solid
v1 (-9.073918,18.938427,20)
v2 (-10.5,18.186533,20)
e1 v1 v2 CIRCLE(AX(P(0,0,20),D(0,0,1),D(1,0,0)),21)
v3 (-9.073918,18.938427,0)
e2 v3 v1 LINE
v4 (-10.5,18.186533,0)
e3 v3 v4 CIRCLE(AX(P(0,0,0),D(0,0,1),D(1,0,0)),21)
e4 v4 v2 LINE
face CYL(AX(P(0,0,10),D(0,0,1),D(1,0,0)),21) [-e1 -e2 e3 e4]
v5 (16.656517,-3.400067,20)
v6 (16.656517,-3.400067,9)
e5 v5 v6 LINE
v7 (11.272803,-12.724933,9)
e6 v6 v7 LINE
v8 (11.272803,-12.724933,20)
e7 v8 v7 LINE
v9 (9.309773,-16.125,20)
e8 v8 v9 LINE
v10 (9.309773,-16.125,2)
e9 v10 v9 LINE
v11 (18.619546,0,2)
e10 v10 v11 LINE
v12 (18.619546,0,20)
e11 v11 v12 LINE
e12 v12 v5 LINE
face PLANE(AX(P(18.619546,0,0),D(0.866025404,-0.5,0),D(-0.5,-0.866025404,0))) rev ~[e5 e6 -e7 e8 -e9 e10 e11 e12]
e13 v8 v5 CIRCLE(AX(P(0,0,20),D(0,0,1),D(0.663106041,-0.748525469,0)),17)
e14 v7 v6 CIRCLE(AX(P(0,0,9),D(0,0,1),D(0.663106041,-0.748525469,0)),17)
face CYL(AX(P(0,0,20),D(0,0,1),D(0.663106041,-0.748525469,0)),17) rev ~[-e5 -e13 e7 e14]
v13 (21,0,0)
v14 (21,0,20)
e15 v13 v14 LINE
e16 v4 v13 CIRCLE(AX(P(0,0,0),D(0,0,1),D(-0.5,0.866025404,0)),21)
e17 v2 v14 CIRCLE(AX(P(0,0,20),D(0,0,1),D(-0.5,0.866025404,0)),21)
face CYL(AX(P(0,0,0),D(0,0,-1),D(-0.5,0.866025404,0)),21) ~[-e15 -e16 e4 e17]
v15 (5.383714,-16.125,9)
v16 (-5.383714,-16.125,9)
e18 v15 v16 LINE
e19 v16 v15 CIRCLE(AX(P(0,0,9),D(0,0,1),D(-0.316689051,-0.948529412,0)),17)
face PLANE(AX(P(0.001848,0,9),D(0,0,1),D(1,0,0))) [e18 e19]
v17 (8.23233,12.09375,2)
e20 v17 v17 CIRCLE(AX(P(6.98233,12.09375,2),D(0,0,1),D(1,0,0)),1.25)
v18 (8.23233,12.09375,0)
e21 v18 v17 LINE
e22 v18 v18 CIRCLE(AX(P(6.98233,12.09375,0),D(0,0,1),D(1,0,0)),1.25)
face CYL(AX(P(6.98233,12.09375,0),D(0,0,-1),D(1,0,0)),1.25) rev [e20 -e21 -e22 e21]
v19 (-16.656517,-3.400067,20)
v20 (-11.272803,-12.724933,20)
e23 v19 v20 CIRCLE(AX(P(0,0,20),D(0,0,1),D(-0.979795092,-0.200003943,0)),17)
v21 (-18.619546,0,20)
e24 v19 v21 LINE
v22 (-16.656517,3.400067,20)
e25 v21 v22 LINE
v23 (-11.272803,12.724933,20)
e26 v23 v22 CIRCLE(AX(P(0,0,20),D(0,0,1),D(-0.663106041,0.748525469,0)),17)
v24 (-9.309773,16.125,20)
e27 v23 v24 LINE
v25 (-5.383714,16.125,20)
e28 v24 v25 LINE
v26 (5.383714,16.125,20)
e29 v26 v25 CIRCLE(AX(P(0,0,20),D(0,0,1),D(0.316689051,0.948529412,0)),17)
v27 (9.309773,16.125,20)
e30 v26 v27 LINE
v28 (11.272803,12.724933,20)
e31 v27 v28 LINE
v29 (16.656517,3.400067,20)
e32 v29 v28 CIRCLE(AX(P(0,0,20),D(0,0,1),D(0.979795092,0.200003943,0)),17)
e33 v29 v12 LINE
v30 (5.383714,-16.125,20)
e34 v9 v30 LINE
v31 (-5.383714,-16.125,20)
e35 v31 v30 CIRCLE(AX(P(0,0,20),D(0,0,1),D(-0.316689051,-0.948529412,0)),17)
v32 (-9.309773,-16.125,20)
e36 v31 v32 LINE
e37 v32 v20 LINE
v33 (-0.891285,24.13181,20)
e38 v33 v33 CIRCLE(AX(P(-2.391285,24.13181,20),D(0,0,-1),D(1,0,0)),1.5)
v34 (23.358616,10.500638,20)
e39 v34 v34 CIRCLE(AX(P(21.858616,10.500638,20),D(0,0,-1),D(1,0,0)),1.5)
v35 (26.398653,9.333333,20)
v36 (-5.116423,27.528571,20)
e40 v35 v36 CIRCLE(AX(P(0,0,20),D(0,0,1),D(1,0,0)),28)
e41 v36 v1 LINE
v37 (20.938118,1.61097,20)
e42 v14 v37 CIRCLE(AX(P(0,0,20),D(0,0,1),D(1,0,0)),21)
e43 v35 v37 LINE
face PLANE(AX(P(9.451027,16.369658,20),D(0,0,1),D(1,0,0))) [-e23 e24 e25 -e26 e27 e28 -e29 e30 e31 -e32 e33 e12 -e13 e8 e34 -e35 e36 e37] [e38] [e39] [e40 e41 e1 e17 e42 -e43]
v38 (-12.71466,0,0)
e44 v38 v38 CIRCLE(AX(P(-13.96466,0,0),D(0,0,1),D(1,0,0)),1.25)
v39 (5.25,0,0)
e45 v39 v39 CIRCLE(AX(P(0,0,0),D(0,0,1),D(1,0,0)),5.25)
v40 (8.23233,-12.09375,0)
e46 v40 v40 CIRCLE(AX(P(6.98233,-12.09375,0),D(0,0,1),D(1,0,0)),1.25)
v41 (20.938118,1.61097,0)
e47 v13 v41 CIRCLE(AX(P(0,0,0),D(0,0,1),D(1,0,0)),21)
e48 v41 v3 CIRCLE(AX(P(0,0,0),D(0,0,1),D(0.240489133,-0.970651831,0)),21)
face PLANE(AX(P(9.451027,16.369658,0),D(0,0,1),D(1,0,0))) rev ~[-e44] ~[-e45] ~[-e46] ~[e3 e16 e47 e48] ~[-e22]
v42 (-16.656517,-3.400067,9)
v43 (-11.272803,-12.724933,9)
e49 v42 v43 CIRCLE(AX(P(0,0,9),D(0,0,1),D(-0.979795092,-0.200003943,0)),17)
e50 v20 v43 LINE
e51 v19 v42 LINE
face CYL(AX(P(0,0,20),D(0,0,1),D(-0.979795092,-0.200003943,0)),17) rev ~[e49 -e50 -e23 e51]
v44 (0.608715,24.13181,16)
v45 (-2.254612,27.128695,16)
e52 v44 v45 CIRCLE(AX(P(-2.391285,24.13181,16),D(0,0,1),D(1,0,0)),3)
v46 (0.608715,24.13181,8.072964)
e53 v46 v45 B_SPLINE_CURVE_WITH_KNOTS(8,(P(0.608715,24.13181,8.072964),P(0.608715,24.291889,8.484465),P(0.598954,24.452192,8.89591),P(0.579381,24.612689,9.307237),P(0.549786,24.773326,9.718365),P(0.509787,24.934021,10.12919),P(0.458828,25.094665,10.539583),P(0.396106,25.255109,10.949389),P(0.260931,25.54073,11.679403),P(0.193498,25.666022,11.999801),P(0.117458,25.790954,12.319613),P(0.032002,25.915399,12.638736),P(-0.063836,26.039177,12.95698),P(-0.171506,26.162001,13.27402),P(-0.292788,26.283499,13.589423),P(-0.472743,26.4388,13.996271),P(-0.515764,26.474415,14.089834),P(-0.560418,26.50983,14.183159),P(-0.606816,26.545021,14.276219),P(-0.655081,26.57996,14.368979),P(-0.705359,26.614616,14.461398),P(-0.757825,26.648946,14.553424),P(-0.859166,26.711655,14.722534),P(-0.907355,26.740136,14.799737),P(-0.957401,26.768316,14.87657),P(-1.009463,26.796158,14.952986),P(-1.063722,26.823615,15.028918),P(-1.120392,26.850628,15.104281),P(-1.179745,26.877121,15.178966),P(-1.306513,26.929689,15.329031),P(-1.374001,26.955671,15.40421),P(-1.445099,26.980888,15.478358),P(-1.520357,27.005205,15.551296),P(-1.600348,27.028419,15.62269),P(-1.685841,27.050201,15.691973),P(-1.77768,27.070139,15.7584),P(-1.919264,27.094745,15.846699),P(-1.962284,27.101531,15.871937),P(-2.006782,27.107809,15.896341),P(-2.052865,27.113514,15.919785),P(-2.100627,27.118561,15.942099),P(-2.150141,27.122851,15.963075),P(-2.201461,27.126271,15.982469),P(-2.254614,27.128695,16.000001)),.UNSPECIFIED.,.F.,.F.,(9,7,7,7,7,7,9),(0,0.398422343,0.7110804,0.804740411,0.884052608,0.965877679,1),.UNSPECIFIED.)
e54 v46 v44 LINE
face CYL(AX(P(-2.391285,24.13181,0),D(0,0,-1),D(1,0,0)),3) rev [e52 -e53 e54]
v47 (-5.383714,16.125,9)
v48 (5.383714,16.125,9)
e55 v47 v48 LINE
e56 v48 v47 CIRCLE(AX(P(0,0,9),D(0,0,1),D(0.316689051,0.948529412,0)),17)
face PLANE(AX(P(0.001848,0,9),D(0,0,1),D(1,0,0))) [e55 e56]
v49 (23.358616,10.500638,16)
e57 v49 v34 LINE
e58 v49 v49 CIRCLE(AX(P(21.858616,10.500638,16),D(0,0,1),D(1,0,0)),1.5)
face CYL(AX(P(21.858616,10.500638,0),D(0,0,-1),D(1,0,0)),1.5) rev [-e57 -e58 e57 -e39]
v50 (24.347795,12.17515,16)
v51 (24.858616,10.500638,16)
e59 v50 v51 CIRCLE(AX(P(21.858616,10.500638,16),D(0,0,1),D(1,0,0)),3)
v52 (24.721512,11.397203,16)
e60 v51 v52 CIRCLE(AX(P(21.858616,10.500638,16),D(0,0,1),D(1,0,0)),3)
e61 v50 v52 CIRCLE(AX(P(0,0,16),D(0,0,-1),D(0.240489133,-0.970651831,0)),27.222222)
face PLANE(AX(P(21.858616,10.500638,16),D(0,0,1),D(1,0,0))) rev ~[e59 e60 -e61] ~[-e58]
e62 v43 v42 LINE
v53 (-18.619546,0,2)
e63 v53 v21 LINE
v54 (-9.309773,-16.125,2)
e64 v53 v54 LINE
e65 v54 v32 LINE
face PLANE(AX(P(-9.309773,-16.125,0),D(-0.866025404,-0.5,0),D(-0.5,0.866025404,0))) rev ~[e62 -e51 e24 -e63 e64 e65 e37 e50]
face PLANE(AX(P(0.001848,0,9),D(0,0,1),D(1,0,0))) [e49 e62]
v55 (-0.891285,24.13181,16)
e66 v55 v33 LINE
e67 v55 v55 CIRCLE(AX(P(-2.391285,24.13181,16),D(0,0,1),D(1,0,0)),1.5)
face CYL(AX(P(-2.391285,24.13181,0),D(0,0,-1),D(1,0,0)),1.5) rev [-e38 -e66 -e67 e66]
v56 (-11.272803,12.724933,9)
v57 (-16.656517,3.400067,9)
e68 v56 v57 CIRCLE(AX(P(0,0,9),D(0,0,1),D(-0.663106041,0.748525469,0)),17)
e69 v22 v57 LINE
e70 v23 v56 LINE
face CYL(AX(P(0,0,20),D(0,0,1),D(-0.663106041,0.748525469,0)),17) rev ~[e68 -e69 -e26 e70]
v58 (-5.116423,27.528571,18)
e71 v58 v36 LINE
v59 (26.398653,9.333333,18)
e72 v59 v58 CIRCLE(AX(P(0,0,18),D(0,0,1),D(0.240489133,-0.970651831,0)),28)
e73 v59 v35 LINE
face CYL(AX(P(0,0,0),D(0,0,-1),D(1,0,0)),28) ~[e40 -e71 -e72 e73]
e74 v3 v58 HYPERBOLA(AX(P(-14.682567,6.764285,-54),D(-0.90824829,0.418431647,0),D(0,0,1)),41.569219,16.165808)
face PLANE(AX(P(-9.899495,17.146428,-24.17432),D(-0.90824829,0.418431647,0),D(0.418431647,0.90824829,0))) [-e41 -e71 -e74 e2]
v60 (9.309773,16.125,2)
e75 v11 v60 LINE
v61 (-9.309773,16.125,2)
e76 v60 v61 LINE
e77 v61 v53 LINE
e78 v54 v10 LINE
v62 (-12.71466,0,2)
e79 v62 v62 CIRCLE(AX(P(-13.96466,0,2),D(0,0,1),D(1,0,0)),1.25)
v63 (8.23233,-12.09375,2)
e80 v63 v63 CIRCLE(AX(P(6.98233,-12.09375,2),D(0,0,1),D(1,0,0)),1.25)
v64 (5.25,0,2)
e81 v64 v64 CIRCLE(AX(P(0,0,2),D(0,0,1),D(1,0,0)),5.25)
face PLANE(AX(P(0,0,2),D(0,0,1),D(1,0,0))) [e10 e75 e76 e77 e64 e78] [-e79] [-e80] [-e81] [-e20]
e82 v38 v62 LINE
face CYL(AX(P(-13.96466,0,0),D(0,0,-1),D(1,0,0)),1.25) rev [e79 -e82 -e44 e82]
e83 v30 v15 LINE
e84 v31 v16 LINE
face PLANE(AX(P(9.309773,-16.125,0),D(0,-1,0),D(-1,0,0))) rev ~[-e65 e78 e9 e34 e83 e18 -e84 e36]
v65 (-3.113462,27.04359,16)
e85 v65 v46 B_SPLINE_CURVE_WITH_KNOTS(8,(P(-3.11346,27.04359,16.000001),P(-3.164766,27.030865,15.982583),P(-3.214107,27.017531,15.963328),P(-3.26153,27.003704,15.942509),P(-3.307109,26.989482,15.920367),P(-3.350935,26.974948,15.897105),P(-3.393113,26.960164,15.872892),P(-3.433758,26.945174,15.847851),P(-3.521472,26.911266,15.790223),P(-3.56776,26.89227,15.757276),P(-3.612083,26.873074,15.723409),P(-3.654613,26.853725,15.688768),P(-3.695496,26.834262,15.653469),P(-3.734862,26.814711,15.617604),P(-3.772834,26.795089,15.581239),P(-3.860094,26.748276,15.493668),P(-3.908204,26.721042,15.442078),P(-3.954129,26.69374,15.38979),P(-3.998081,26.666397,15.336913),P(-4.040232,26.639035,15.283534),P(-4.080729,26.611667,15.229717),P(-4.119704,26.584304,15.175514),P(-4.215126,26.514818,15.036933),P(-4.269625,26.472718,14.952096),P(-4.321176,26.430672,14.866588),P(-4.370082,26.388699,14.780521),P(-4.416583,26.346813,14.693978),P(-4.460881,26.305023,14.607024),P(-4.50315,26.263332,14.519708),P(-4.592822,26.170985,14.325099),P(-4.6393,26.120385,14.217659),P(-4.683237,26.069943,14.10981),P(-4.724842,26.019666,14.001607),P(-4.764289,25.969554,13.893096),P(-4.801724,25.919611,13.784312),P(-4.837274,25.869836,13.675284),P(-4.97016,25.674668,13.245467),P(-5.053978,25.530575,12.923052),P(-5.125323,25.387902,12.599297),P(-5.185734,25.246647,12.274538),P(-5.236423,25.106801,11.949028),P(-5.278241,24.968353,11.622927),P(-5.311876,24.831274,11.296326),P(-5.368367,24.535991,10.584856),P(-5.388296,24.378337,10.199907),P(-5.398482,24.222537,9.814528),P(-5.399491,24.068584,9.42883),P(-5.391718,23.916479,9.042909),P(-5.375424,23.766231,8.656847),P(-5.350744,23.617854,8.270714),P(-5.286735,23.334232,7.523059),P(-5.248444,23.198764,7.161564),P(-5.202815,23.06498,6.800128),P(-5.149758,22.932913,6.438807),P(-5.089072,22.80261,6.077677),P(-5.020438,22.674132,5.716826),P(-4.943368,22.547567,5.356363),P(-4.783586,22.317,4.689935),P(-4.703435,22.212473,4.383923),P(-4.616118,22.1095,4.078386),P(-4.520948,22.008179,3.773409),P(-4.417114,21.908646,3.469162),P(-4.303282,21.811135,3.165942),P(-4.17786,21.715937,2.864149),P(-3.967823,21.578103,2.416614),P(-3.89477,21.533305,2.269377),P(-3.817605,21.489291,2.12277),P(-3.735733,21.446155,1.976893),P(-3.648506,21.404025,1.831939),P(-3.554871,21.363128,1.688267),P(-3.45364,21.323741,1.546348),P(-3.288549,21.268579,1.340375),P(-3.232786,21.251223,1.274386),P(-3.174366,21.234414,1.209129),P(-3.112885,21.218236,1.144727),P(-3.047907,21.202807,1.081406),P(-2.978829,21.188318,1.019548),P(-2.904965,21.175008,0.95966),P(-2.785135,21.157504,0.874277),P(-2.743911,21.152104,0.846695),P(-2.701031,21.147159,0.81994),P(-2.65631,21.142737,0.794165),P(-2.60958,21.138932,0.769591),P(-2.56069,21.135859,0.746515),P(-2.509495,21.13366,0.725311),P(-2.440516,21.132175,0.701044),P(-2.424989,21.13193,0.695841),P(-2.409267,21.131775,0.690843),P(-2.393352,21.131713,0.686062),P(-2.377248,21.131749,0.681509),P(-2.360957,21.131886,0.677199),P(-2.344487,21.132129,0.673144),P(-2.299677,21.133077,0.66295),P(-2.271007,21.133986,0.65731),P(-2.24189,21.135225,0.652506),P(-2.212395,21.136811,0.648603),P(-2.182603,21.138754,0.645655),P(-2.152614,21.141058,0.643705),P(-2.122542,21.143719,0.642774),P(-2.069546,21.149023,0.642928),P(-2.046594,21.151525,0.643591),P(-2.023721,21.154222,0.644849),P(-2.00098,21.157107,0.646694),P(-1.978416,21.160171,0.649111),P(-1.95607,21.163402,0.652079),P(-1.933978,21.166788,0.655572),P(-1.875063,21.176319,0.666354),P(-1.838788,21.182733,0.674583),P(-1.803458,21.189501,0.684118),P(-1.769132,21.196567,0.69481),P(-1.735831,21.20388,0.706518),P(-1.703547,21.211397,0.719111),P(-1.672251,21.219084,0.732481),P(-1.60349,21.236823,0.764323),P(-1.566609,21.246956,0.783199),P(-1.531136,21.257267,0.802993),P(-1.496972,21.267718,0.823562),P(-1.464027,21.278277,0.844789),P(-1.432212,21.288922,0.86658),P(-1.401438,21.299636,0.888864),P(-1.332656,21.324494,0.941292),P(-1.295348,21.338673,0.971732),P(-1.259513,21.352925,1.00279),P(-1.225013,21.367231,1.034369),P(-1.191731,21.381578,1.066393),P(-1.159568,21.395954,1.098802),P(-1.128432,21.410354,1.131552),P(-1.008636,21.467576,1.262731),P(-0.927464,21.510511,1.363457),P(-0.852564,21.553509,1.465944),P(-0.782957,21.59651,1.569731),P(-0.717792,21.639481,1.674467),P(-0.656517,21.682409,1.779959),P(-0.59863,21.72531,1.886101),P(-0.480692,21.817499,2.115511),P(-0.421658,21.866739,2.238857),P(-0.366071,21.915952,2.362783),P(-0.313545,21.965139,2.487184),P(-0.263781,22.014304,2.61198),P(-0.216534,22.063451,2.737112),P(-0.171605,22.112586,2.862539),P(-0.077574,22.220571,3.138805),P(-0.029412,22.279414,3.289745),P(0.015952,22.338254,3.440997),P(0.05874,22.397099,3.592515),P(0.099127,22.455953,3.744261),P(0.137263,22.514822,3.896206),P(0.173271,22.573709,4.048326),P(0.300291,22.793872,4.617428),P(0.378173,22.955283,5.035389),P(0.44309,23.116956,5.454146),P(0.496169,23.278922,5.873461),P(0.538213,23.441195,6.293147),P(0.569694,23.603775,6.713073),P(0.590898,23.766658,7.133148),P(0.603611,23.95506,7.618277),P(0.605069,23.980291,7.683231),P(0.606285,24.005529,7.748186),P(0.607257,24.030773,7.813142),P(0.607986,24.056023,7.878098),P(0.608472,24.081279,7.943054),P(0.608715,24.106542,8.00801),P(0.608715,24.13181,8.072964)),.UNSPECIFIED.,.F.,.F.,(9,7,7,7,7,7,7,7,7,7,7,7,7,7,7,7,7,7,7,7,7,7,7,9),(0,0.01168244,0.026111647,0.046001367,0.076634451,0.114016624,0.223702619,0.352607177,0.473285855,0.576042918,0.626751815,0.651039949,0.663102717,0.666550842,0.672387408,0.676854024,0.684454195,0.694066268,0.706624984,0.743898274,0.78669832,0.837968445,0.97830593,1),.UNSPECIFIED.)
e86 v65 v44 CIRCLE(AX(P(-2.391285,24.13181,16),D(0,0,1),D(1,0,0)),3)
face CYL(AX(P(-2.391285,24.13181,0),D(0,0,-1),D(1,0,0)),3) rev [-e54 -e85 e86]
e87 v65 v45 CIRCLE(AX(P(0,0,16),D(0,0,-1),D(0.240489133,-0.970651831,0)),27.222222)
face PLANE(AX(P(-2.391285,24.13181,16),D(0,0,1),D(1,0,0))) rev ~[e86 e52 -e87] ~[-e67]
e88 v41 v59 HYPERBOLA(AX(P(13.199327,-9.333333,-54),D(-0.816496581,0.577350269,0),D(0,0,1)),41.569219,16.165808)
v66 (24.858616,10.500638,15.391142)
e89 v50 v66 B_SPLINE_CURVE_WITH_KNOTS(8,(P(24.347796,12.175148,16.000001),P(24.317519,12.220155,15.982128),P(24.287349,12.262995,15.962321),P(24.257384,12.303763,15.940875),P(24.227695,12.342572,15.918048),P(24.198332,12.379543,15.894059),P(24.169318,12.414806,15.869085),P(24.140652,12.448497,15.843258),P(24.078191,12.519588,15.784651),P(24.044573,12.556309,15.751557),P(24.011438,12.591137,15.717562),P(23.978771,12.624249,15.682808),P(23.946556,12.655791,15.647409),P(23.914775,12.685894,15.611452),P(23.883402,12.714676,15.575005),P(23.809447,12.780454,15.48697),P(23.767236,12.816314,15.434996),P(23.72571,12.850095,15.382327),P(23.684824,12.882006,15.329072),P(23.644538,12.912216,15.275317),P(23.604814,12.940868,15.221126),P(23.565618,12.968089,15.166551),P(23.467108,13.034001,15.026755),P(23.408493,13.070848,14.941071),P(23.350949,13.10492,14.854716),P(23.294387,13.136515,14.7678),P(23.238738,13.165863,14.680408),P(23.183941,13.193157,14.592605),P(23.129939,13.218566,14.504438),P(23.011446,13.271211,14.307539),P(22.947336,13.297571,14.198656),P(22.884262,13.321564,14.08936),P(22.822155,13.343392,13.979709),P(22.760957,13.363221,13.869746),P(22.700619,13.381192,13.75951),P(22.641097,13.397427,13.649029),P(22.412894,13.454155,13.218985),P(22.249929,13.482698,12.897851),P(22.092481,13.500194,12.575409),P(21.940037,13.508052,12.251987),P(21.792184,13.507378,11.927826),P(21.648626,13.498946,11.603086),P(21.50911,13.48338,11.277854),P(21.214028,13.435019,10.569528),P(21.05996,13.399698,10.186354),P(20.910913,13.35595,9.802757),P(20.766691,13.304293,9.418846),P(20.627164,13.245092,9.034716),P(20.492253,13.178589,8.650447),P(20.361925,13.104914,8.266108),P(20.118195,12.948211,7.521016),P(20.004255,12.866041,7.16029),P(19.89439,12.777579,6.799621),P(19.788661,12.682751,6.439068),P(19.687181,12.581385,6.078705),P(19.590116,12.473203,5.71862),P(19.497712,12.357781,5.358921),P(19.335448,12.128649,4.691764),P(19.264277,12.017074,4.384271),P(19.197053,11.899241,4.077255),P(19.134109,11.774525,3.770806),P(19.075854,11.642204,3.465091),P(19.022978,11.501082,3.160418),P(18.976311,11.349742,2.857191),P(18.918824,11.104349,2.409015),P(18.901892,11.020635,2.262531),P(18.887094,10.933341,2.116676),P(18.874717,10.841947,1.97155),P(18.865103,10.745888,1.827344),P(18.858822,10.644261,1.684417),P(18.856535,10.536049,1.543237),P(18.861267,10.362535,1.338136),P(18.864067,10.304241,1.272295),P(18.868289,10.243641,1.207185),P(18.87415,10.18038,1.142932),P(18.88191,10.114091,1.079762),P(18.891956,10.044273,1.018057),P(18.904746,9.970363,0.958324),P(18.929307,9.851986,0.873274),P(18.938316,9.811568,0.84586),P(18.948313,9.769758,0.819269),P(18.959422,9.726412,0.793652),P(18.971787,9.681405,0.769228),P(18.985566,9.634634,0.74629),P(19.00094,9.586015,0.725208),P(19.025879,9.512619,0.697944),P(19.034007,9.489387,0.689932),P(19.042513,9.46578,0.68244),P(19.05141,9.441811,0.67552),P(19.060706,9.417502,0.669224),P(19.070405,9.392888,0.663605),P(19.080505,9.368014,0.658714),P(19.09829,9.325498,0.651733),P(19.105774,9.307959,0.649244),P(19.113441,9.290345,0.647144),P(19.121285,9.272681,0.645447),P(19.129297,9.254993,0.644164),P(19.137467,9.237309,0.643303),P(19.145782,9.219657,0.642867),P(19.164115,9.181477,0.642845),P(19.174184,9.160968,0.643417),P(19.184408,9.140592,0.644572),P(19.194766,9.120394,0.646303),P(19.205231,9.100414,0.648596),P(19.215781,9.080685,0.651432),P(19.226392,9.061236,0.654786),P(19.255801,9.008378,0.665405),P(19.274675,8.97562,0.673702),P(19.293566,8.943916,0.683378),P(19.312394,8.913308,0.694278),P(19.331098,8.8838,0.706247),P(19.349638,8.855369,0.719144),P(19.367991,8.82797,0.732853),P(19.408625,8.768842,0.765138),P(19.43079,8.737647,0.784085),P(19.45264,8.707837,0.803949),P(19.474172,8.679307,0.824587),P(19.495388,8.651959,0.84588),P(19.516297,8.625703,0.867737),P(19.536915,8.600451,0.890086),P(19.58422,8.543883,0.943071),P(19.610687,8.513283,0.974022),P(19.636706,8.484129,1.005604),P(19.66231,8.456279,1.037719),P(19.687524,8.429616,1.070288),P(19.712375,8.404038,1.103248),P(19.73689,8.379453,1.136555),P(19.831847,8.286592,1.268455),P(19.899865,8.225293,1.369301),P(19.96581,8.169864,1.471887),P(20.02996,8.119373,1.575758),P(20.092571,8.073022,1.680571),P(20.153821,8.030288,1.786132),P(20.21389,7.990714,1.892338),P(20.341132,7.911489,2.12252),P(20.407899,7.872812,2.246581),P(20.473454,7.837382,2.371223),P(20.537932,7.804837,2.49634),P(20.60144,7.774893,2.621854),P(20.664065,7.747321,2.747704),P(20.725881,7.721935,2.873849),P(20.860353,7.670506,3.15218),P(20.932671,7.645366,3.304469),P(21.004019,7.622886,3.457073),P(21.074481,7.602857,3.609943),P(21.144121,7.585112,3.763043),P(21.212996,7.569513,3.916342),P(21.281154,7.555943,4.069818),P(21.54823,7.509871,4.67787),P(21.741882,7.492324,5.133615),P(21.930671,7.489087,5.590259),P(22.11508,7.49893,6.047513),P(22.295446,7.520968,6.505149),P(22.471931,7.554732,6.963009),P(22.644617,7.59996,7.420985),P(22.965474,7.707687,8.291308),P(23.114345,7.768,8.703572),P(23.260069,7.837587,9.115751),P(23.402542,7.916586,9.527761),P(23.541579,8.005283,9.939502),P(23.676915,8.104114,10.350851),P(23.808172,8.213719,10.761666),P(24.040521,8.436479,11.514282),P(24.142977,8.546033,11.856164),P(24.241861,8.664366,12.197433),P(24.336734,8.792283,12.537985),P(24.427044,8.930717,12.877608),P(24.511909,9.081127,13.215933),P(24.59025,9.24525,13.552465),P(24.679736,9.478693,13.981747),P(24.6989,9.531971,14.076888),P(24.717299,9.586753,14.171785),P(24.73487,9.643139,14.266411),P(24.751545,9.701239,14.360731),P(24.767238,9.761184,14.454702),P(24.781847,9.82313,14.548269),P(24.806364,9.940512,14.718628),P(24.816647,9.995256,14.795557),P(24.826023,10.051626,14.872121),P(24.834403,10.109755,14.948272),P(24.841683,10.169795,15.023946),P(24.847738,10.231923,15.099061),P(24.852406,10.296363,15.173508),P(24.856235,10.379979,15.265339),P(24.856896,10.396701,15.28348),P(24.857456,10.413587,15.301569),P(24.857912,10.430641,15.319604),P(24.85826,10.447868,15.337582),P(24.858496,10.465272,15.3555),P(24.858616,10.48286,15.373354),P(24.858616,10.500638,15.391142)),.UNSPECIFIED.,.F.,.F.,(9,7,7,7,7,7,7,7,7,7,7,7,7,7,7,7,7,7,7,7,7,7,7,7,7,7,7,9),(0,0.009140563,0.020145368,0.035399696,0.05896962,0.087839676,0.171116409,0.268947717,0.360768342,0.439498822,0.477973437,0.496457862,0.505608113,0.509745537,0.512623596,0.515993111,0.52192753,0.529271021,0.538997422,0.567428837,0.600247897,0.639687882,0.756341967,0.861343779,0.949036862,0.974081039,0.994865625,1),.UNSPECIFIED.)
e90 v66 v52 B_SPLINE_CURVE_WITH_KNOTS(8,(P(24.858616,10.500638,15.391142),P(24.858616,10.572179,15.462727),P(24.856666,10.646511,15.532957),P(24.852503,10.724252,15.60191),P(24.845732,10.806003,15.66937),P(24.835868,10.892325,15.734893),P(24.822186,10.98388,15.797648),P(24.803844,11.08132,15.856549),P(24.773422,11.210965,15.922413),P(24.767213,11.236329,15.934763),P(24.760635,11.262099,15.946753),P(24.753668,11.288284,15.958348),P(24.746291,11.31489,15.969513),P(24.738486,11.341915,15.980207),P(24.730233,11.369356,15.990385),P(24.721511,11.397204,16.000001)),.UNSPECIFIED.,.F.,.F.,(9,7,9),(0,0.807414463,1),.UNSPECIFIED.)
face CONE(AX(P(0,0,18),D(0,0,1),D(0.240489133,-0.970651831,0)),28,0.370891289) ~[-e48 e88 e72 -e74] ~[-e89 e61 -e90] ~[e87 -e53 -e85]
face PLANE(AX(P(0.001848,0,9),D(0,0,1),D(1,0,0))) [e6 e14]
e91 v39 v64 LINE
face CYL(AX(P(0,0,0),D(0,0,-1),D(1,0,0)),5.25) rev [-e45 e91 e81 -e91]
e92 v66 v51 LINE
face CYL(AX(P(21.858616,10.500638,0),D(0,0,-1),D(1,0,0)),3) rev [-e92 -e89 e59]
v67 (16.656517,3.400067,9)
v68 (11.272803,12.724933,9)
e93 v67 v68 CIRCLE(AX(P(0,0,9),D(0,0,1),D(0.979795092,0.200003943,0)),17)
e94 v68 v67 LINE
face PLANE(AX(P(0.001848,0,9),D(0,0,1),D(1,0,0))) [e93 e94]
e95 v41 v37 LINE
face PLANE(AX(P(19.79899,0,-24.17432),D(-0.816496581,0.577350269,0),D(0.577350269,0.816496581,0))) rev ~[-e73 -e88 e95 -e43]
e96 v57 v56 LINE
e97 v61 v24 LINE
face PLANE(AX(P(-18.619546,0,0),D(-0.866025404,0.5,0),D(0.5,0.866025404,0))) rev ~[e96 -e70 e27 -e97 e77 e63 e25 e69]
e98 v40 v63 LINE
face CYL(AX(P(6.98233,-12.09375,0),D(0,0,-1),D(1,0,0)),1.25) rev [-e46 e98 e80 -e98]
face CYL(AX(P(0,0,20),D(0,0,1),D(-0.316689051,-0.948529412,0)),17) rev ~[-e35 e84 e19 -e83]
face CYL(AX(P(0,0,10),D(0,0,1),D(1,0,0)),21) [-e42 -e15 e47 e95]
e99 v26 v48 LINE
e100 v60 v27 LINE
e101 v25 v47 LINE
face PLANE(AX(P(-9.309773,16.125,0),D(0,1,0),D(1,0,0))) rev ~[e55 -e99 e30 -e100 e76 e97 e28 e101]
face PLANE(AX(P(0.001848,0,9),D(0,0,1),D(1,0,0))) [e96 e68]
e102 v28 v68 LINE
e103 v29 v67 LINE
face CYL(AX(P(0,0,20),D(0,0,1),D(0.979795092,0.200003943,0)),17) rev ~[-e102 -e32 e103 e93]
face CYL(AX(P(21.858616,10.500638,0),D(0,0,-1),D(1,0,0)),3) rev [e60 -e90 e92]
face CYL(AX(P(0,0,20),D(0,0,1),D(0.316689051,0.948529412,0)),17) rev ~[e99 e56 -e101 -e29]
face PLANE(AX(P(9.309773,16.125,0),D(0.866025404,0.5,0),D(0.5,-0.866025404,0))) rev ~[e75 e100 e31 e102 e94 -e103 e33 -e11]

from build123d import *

# Parameters (mm, degrees)
F0_R         = 1.25
F0_R_2       = 5.25
F1_DEPTH     = 2
F2_DEPTH     = 20
F3_DEPTH     = 20
F4_T4_DEPTH  = 68.3486393209
F4_S5_R      = 21
F4_T6_DEPTH  = 36
F4_T10_DEPTH = 68.3486393209
F4_S11_R     = 21
F4_T12_DEPTH = 36
F5_T2_ANGLE  = 272.1691776214
F6_R         = 1.5
F7_DEPTH     = 25
F6_R_2       = 3
F8_DEPTH     = 16
F10_DEPTH    = 11


# Not quite as in the source:
# - a fillet or chamfer that OpenCascade refuses, or shapes differently, is made with other operations: its cross-section is extruded or revolved along the edge and cut away or added


with BuildPart() as f1:
    # F0 (on Top) → F1 (new body)
    with BuildSketch(Plane.XY):
        Polygon((-9.3097730907, -16.125), (9.3097730907, -16.125), (18.6195461814, 0), (9.3097730907, 16.125), (-9.3097730907, 16.125), (-18.6195461814, 0), align=None)
        with Locations((6.982329818, -12.09375)):
            Circle(F0_R, mode=Mode.SUBTRACT)
        with Locations((-13.964659636, 0)):
            Circle(F0_R, mode=Mode.SUBTRACT)
        Circle(F0_R_2, mode=Mode.SUBTRACT)
        with Locations((6.982329818, 12.09375)):
            Circle(F0_R, mode=Mode.SUBTRACT)
    extrude(amount=F1_DEPTH)

    # F0 (on Top) → F2 (join)
    with BuildSketch(Plane.XY):
        with BuildLine():
            ThreePointArc((-10.5, 18.1865334795), (-10.5, -18.1865334795), (21, 0))
            ThreePointArc((21, 0), (10.5, 18.1865334795), (-10.5, 18.1865334795))
        make_face()
        Polygon((18.6195461814, 0), (9.3097730907, -16.125), (-9.3097730907, -16.125), (-18.6195461814, 0), (-9.3097730907, 16.125), (9.3097730907, 16.125), align=None, mode=Mode.SUBTRACT)
    extrude(amount=F2_DEPTH)

    # F0 (on Top) → F3 (join)
    with BuildSketch(Plane.XY):
        with BuildLine():
            ThreePointArc((-10.5, 18.1865334795), (10.5, 18.1865334795), (21, 0))
            Line((21, 0), (28, 0))
            ThreePointArc((28, 0), (14, 24.248711306), (-14, 24.248711306))
            Line((-14, 24.248711306), (-10.5, 18.1865334795))
        make_face()
    extrude(amount=F3_DEPTH)

    # F4: chamfer of 7 on 2 edges, made by hand


with BuildPart() as f4_tool2:
    # F4_s3 → F4_t4 (new body)
    with BuildSketch(Plane.XY.offset(-24.1743196605)):
        with BuildLine():
            Line((-9.8994949366, 17.1464281995), (-5.1164228135, 27.5285709326))
            ThreePointArc((-5.1164228135, 27.5285709326), (-9.6039256501, 26.3014184429), (-14, 24.248711306))
            Line((-14, 24.248711306), (-9.8994949366, 17.1464281995))
        make_face()
    extrude(amount=F4_T4_DEPTH)

    # F4_s5 → F4_t6 (cut, symmetric)
    with BuildSketch(Plane.XY.offset(10)):
        Circle(F4_S5_R)
    extrude(amount=F4_T6_DEPTH, both=True, mode=Mode.SUBTRACT)


with BuildPart() as f1_1:
    add(f1.part)

    # F4_t1: cut F4_tool2
    add(f4_tool2.part, mode=Mode.SUBTRACT)


with BuildPart() as f4_tool8:
    # F4_s9 → F4_t10 (new body)
    with BuildSketch(Plane.XY.offset(-24.1743196605)):
        with BuildLine():
            Line((19.7989898732, 0), (26.3986531643, 9.3333333333))
            ThreePointArc((26.3986531643, 9.3333333333), (27.5796593521, 4.8334656324), (28, 0))
            Line((28, 0), (19.7989898732, 0))
        make_face()
    extrude(amount=F4_T10_DEPTH)

    # F4_s11 → F4_t12 (cut, symmetric)
    with BuildSketch(Plane.XY.offset(10)):
        Circle(F4_S11_R)
    extrude(amount=F4_T12_DEPTH, both=True, mode=Mode.SUBTRACT)


with BuildPart() as f1_2:
    add(f1_1.part)

    # F4_t7: cut F4_tool8
    add(f4_tool8.part, mode=Mode.SUBTRACT)

    # F5: chamfer of 18 x 7 on 1 edges, made by hand

    # F5_s1 → F5_t2 (revolve, cut)
    with BuildSketch(Plane(origin=(0, 0, 0), x_dir=(0, 0, 1), z_dir=(-0.9706518309, -0.2404891332, 0))):
        Polygon((18, -28), (0, -21), (0, -28), align=None)
    revolve(axis=Axis((0, 0, 0), (0, 0, 1)), revolution_arc=F5_T2_ANGLE, mode=Mode.SUBTRACT)

    # F6 (on face) → F7 (cut)
    with BuildSketch(Plane.XY):
        with Locations((21.8586163831, 10.5006375909)):
            Circle(F6_R)
        with Locations((-2.3912845495, 24.1318100897)):
            Circle(F6_R)
    extrude(amount=F7_DEPTH, mode=Mode.SUBTRACT)

    # F6 (on face) → F8 (cut)
    with BuildSketch(Plane.XY):
        with Locations((-2.3912845495, 24.1318100897)):
            Circle(F6_R_2)
        with Locations((-2.3912845495, 24.1318100897)):
            Circle(F6_R, mode=Mode.SUBTRACT)
        with Locations((21.8586163831, 10.5006375909)):
            Circle(F6_R_2)
        with Locations((21.8586163831, 10.5006375909)):
            Circle(F6_R, mode=Mode.SUBTRACT)
    extrude(amount=F8_DEPTH, mode=Mode.SUBTRACT)

    # F9 (on face) → F10 (cut)
    with BuildSketch(Plane.XY.offset(20)):
        with BuildLine():
            ThreePointArc((16.6565165694, -3.4000670246), (16.9139111633, -1.7086863843), (17, 0))
            ThreePointArc((17, 0), (16.9139111633, 1.7086863843), (16.6565165694, 3.4000670246))
            Line((16.6565165694, 3.4000670246), (11.2728027026, 12.7249329754))
            ThreePointArc((11.2728027026, 12.7249329754), (8.5, 14.7224318643), (5.3837138668, 16.125))
            Line((5.3837138668, 16.125), (-5.3837138668, 16.125))
            ThreePointArc((-5.3837138668, 16.125), (-8.5, 14.7224318643), (-11.2728027026, 12.7249329754))
            Line((-11.2728027026, 12.7249329754), (-16.6565165694, 3.4000670246))
            ThreePointArc((-16.6565165694, 3.4000670246), (-17, 0), (-16.6565165694, -3.4000670246))
            Line((-16.6565165694, -3.4000670246), (-11.2728027026, -12.7249329754))
            ThreePointArc((-11.2728027026, -12.7249329754), (-8.5, -14.7224318643), (-5.3837138668, -16.125))
            Line((-5.3837138668, -16.125), (5.3837138668, -16.125))
            ThreePointArc((5.3837138668, -16.125), (8.5, -14.7224318643), (11.2728027026, -12.7249329754))
            Line((11.2728027026, -12.7249329754), (16.6565165694, -3.4000670246))
        make_face()
        with BuildLine():
            Line((11.2728027026, 12.7249329754), (16.6565165694, 3.4000670246))
            ThreePointArc((16.6565165694, 3.4000670246), (14.7224318643, 8.5), (11.2728027026, 12.7249329754))
        make_face()
        with BuildLine():
            ThreePointArc((11.2728027026, -12.7249329754), (14.7224318643, -8.5), (16.6565165694, -3.4000670246))
            Line((16.6565165694, -3.4000670246), (11.2728027026, -12.7249329754))
        make_face()
        with BuildLine():
            Line((-5.3837138668, 16.125), (5.3837138668, 16.125))
            ThreePointArc((5.3837138668, 16.125), (0, 17), (-5.3837138668, 16.125))
        make_face()
        with BuildLine():
            ThreePointArc((-5.3837138668, -16.125), (0, -17), (5.3837138668, -16.125))
            Line((5.3837138668, -16.125), (-5.3837138668, -16.125))
        make_face()
        with BuildLine():
            Line((-16.6565165694, 3.4000670246), (-11.2728027026, 12.7249329754))
            ThreePointArc((-11.2728027026, 12.7249329754), (-14.7224318643, 8.5), (-16.6565165694, 3.4000670246))
        make_face()
        with BuildLine():
            ThreePointArc((-16.6565165694, -3.4000670246), (-14.7224318643, -8.5), (-11.2728027026, -12.7249329754))
            Line((-11.2728027026, -12.7249329754), (-16.6565165694, -3.4000670246))
        make_face()
    extrude(amount=-F10_DEPTH, mode=Mode.SUBTRACT)


solid = f1_2.part
